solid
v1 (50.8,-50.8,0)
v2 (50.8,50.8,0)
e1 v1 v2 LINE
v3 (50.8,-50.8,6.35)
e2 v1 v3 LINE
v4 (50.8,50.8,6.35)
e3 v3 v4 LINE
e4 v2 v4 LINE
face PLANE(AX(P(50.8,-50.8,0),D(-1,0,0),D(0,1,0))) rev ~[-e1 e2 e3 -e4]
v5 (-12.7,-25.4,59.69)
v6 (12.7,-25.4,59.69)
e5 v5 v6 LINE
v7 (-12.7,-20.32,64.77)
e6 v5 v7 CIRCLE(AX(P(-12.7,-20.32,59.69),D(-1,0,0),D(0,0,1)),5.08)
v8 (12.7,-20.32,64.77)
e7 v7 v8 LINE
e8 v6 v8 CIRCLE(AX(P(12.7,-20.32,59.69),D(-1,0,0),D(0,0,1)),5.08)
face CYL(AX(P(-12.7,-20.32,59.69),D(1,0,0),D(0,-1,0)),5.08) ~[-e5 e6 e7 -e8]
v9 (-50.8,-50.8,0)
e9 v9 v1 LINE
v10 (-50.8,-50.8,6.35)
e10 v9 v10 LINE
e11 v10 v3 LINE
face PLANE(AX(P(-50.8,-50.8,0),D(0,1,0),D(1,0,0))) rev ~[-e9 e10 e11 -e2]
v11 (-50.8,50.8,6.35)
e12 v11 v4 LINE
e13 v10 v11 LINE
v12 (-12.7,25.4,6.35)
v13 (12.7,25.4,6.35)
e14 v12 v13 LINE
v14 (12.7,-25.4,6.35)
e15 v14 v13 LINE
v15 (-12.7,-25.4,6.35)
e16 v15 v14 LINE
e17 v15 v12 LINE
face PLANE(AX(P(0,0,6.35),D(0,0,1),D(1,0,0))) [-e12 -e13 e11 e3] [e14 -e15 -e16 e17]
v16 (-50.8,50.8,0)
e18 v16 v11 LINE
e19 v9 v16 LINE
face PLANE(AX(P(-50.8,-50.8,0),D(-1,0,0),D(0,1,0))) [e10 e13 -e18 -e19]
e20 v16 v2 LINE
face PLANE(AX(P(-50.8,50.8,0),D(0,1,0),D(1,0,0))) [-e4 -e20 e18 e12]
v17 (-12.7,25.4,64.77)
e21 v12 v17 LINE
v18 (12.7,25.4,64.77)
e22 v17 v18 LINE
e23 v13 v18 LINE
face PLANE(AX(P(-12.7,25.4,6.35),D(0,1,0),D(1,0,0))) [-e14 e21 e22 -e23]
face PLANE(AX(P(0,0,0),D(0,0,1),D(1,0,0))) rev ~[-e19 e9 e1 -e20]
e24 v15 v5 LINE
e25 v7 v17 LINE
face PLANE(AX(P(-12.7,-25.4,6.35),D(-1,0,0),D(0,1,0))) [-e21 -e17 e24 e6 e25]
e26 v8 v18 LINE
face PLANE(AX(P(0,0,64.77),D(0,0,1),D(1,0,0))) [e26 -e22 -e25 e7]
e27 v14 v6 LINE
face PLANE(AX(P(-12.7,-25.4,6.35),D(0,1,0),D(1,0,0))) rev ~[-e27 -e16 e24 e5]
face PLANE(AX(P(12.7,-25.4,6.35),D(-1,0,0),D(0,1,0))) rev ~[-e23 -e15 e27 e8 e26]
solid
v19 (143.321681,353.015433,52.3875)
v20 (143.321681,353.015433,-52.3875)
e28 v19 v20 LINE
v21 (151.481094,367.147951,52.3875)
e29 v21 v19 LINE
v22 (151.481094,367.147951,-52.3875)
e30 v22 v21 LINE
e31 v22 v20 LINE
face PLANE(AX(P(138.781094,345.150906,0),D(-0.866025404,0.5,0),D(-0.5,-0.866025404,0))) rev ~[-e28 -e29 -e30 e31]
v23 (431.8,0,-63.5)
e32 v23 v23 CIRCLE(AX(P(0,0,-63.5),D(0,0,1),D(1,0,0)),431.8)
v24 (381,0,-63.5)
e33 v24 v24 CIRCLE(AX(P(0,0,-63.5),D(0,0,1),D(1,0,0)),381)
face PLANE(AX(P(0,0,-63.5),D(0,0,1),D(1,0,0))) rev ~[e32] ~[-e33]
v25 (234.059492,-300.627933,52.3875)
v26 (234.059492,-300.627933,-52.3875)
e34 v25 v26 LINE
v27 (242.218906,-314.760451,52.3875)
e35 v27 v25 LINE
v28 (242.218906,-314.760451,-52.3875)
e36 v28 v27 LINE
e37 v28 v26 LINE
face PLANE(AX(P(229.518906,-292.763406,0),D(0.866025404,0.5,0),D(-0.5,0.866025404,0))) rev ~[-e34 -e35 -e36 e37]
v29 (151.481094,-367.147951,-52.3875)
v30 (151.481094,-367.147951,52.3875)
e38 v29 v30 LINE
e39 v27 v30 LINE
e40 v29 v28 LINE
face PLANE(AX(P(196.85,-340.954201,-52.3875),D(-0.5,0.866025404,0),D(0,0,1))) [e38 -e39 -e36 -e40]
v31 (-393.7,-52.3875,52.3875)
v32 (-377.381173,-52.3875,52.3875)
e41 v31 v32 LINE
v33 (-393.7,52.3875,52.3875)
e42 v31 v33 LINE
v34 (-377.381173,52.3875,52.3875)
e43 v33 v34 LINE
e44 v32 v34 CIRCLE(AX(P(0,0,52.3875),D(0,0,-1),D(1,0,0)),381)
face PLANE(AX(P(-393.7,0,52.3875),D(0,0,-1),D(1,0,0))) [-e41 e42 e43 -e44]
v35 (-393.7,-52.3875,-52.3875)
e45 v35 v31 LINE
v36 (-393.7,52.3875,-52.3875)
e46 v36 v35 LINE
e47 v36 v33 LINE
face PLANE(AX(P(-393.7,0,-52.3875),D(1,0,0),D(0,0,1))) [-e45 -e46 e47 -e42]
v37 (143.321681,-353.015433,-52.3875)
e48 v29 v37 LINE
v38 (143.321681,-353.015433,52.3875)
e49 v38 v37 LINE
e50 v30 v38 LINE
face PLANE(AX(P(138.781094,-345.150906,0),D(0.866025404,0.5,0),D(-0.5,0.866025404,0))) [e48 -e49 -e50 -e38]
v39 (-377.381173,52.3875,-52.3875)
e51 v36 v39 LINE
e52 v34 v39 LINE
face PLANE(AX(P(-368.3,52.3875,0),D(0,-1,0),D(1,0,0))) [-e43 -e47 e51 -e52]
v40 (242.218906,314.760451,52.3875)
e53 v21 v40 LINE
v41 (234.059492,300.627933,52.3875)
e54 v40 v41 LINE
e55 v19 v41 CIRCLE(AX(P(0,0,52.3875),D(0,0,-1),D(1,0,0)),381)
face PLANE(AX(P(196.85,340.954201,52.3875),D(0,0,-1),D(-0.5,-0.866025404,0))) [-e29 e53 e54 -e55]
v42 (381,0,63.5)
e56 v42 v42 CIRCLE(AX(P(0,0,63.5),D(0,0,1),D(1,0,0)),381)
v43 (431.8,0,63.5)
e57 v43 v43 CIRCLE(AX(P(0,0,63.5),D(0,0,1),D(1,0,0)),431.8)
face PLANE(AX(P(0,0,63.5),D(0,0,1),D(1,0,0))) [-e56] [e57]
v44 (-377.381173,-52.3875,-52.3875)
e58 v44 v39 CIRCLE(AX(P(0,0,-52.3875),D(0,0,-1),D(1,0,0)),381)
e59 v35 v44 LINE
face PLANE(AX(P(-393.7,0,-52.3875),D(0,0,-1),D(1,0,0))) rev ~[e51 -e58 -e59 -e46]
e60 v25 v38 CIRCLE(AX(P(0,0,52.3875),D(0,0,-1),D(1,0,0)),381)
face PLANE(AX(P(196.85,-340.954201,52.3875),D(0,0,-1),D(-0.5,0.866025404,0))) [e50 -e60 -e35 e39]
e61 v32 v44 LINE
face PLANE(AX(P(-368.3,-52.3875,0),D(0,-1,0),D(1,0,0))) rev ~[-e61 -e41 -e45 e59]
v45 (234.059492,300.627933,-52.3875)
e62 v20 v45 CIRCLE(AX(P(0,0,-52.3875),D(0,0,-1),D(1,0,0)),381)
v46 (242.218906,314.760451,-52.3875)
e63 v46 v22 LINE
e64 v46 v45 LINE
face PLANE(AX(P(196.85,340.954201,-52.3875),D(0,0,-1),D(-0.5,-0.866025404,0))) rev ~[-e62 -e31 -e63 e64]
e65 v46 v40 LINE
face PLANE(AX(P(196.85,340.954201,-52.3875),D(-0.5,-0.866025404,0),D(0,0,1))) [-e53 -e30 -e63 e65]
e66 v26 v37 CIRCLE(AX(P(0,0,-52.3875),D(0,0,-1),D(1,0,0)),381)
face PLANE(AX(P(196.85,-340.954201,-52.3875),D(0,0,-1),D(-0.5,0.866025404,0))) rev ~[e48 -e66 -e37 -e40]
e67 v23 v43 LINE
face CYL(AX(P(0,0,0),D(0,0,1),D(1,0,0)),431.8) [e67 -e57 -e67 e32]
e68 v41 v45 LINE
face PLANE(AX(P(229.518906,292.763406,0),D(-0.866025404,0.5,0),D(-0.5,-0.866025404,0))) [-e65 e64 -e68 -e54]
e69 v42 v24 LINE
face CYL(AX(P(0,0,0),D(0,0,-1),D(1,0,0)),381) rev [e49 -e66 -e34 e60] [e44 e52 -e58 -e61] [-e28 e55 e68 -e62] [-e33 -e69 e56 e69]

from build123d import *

# Parameters (mm, degrees)
F0_R            = 431.8
F0_R_2          = 381
F1_DEPTH        = 63.5
F2_W            = 50.8
F2_H            = 104.775
F3_DEPTH        = 52.3875
F3_COPIES_COUNT = 3
F4_W            = 101.6
F4_H            = 101.6
F5_DEPTH        = 6.35
F6_W            = 25.4
F6_H            = 50.8
F7_DEPTH        = 58.42
F8_R            = 5.08


# Not quite as in the source:
# - a pattern or mirror of a feature is missing from the dataset's text; its kind, count and spacing are read off the source's solid


with BuildPart() as f1:
    # F0 (on Top) → F1 (new body, symmetric)
    with BuildSketch(Plane.XY):
        Circle(F0_R)
        Circle(F0_R_2, mode=Mode.SUBTRACT)
    extrude(amount=F1_DEPTH, both=True)

    # F2 (on Front) → F3 (cut, symmetric)
    with BuildSketch(Plane.XZ):
        with Locations((-368.3, 0)):
            Rectangle(F2_W, F2_H)
    f3 = extrude(amount=F3_DEPTH, both=True, mode=Mode.SUBTRACT)

    # F3_copies: F3 ×3 about axis
    f3_copies_axis = Axis((0, 0, 0), (0, 0, 1))
    for i in range(1, F3_COPIES_COUNT):
        add(f3.rotate(f3_copies_axis, i * 360 / F3_COPIES_COUNT), mode=Mode.SUBTRACT)


with BuildPart() as f5:
    # F4 (on Top) → F5 (new body)
    with BuildSketch(Plane.XY):
        Rectangle(F4_W, F4_H)
    extrude(amount=F5_DEPTH)

    # F6 (on face) → F7 (join)
    with BuildSketch(Plane.XY.offset(6.35)):
        Rectangle(F6_W, F6_H)
    extrude(amount=F7_DEPTH)

    # F8
    f8_edges = [f5.edges().sort_by_distance(p)[0] for p in [
        (0, -25.4, 64.77),
    ]]
    fillet(f8_edges, radius=F8_R)


solid = Compound([f1.part, f5.part])
